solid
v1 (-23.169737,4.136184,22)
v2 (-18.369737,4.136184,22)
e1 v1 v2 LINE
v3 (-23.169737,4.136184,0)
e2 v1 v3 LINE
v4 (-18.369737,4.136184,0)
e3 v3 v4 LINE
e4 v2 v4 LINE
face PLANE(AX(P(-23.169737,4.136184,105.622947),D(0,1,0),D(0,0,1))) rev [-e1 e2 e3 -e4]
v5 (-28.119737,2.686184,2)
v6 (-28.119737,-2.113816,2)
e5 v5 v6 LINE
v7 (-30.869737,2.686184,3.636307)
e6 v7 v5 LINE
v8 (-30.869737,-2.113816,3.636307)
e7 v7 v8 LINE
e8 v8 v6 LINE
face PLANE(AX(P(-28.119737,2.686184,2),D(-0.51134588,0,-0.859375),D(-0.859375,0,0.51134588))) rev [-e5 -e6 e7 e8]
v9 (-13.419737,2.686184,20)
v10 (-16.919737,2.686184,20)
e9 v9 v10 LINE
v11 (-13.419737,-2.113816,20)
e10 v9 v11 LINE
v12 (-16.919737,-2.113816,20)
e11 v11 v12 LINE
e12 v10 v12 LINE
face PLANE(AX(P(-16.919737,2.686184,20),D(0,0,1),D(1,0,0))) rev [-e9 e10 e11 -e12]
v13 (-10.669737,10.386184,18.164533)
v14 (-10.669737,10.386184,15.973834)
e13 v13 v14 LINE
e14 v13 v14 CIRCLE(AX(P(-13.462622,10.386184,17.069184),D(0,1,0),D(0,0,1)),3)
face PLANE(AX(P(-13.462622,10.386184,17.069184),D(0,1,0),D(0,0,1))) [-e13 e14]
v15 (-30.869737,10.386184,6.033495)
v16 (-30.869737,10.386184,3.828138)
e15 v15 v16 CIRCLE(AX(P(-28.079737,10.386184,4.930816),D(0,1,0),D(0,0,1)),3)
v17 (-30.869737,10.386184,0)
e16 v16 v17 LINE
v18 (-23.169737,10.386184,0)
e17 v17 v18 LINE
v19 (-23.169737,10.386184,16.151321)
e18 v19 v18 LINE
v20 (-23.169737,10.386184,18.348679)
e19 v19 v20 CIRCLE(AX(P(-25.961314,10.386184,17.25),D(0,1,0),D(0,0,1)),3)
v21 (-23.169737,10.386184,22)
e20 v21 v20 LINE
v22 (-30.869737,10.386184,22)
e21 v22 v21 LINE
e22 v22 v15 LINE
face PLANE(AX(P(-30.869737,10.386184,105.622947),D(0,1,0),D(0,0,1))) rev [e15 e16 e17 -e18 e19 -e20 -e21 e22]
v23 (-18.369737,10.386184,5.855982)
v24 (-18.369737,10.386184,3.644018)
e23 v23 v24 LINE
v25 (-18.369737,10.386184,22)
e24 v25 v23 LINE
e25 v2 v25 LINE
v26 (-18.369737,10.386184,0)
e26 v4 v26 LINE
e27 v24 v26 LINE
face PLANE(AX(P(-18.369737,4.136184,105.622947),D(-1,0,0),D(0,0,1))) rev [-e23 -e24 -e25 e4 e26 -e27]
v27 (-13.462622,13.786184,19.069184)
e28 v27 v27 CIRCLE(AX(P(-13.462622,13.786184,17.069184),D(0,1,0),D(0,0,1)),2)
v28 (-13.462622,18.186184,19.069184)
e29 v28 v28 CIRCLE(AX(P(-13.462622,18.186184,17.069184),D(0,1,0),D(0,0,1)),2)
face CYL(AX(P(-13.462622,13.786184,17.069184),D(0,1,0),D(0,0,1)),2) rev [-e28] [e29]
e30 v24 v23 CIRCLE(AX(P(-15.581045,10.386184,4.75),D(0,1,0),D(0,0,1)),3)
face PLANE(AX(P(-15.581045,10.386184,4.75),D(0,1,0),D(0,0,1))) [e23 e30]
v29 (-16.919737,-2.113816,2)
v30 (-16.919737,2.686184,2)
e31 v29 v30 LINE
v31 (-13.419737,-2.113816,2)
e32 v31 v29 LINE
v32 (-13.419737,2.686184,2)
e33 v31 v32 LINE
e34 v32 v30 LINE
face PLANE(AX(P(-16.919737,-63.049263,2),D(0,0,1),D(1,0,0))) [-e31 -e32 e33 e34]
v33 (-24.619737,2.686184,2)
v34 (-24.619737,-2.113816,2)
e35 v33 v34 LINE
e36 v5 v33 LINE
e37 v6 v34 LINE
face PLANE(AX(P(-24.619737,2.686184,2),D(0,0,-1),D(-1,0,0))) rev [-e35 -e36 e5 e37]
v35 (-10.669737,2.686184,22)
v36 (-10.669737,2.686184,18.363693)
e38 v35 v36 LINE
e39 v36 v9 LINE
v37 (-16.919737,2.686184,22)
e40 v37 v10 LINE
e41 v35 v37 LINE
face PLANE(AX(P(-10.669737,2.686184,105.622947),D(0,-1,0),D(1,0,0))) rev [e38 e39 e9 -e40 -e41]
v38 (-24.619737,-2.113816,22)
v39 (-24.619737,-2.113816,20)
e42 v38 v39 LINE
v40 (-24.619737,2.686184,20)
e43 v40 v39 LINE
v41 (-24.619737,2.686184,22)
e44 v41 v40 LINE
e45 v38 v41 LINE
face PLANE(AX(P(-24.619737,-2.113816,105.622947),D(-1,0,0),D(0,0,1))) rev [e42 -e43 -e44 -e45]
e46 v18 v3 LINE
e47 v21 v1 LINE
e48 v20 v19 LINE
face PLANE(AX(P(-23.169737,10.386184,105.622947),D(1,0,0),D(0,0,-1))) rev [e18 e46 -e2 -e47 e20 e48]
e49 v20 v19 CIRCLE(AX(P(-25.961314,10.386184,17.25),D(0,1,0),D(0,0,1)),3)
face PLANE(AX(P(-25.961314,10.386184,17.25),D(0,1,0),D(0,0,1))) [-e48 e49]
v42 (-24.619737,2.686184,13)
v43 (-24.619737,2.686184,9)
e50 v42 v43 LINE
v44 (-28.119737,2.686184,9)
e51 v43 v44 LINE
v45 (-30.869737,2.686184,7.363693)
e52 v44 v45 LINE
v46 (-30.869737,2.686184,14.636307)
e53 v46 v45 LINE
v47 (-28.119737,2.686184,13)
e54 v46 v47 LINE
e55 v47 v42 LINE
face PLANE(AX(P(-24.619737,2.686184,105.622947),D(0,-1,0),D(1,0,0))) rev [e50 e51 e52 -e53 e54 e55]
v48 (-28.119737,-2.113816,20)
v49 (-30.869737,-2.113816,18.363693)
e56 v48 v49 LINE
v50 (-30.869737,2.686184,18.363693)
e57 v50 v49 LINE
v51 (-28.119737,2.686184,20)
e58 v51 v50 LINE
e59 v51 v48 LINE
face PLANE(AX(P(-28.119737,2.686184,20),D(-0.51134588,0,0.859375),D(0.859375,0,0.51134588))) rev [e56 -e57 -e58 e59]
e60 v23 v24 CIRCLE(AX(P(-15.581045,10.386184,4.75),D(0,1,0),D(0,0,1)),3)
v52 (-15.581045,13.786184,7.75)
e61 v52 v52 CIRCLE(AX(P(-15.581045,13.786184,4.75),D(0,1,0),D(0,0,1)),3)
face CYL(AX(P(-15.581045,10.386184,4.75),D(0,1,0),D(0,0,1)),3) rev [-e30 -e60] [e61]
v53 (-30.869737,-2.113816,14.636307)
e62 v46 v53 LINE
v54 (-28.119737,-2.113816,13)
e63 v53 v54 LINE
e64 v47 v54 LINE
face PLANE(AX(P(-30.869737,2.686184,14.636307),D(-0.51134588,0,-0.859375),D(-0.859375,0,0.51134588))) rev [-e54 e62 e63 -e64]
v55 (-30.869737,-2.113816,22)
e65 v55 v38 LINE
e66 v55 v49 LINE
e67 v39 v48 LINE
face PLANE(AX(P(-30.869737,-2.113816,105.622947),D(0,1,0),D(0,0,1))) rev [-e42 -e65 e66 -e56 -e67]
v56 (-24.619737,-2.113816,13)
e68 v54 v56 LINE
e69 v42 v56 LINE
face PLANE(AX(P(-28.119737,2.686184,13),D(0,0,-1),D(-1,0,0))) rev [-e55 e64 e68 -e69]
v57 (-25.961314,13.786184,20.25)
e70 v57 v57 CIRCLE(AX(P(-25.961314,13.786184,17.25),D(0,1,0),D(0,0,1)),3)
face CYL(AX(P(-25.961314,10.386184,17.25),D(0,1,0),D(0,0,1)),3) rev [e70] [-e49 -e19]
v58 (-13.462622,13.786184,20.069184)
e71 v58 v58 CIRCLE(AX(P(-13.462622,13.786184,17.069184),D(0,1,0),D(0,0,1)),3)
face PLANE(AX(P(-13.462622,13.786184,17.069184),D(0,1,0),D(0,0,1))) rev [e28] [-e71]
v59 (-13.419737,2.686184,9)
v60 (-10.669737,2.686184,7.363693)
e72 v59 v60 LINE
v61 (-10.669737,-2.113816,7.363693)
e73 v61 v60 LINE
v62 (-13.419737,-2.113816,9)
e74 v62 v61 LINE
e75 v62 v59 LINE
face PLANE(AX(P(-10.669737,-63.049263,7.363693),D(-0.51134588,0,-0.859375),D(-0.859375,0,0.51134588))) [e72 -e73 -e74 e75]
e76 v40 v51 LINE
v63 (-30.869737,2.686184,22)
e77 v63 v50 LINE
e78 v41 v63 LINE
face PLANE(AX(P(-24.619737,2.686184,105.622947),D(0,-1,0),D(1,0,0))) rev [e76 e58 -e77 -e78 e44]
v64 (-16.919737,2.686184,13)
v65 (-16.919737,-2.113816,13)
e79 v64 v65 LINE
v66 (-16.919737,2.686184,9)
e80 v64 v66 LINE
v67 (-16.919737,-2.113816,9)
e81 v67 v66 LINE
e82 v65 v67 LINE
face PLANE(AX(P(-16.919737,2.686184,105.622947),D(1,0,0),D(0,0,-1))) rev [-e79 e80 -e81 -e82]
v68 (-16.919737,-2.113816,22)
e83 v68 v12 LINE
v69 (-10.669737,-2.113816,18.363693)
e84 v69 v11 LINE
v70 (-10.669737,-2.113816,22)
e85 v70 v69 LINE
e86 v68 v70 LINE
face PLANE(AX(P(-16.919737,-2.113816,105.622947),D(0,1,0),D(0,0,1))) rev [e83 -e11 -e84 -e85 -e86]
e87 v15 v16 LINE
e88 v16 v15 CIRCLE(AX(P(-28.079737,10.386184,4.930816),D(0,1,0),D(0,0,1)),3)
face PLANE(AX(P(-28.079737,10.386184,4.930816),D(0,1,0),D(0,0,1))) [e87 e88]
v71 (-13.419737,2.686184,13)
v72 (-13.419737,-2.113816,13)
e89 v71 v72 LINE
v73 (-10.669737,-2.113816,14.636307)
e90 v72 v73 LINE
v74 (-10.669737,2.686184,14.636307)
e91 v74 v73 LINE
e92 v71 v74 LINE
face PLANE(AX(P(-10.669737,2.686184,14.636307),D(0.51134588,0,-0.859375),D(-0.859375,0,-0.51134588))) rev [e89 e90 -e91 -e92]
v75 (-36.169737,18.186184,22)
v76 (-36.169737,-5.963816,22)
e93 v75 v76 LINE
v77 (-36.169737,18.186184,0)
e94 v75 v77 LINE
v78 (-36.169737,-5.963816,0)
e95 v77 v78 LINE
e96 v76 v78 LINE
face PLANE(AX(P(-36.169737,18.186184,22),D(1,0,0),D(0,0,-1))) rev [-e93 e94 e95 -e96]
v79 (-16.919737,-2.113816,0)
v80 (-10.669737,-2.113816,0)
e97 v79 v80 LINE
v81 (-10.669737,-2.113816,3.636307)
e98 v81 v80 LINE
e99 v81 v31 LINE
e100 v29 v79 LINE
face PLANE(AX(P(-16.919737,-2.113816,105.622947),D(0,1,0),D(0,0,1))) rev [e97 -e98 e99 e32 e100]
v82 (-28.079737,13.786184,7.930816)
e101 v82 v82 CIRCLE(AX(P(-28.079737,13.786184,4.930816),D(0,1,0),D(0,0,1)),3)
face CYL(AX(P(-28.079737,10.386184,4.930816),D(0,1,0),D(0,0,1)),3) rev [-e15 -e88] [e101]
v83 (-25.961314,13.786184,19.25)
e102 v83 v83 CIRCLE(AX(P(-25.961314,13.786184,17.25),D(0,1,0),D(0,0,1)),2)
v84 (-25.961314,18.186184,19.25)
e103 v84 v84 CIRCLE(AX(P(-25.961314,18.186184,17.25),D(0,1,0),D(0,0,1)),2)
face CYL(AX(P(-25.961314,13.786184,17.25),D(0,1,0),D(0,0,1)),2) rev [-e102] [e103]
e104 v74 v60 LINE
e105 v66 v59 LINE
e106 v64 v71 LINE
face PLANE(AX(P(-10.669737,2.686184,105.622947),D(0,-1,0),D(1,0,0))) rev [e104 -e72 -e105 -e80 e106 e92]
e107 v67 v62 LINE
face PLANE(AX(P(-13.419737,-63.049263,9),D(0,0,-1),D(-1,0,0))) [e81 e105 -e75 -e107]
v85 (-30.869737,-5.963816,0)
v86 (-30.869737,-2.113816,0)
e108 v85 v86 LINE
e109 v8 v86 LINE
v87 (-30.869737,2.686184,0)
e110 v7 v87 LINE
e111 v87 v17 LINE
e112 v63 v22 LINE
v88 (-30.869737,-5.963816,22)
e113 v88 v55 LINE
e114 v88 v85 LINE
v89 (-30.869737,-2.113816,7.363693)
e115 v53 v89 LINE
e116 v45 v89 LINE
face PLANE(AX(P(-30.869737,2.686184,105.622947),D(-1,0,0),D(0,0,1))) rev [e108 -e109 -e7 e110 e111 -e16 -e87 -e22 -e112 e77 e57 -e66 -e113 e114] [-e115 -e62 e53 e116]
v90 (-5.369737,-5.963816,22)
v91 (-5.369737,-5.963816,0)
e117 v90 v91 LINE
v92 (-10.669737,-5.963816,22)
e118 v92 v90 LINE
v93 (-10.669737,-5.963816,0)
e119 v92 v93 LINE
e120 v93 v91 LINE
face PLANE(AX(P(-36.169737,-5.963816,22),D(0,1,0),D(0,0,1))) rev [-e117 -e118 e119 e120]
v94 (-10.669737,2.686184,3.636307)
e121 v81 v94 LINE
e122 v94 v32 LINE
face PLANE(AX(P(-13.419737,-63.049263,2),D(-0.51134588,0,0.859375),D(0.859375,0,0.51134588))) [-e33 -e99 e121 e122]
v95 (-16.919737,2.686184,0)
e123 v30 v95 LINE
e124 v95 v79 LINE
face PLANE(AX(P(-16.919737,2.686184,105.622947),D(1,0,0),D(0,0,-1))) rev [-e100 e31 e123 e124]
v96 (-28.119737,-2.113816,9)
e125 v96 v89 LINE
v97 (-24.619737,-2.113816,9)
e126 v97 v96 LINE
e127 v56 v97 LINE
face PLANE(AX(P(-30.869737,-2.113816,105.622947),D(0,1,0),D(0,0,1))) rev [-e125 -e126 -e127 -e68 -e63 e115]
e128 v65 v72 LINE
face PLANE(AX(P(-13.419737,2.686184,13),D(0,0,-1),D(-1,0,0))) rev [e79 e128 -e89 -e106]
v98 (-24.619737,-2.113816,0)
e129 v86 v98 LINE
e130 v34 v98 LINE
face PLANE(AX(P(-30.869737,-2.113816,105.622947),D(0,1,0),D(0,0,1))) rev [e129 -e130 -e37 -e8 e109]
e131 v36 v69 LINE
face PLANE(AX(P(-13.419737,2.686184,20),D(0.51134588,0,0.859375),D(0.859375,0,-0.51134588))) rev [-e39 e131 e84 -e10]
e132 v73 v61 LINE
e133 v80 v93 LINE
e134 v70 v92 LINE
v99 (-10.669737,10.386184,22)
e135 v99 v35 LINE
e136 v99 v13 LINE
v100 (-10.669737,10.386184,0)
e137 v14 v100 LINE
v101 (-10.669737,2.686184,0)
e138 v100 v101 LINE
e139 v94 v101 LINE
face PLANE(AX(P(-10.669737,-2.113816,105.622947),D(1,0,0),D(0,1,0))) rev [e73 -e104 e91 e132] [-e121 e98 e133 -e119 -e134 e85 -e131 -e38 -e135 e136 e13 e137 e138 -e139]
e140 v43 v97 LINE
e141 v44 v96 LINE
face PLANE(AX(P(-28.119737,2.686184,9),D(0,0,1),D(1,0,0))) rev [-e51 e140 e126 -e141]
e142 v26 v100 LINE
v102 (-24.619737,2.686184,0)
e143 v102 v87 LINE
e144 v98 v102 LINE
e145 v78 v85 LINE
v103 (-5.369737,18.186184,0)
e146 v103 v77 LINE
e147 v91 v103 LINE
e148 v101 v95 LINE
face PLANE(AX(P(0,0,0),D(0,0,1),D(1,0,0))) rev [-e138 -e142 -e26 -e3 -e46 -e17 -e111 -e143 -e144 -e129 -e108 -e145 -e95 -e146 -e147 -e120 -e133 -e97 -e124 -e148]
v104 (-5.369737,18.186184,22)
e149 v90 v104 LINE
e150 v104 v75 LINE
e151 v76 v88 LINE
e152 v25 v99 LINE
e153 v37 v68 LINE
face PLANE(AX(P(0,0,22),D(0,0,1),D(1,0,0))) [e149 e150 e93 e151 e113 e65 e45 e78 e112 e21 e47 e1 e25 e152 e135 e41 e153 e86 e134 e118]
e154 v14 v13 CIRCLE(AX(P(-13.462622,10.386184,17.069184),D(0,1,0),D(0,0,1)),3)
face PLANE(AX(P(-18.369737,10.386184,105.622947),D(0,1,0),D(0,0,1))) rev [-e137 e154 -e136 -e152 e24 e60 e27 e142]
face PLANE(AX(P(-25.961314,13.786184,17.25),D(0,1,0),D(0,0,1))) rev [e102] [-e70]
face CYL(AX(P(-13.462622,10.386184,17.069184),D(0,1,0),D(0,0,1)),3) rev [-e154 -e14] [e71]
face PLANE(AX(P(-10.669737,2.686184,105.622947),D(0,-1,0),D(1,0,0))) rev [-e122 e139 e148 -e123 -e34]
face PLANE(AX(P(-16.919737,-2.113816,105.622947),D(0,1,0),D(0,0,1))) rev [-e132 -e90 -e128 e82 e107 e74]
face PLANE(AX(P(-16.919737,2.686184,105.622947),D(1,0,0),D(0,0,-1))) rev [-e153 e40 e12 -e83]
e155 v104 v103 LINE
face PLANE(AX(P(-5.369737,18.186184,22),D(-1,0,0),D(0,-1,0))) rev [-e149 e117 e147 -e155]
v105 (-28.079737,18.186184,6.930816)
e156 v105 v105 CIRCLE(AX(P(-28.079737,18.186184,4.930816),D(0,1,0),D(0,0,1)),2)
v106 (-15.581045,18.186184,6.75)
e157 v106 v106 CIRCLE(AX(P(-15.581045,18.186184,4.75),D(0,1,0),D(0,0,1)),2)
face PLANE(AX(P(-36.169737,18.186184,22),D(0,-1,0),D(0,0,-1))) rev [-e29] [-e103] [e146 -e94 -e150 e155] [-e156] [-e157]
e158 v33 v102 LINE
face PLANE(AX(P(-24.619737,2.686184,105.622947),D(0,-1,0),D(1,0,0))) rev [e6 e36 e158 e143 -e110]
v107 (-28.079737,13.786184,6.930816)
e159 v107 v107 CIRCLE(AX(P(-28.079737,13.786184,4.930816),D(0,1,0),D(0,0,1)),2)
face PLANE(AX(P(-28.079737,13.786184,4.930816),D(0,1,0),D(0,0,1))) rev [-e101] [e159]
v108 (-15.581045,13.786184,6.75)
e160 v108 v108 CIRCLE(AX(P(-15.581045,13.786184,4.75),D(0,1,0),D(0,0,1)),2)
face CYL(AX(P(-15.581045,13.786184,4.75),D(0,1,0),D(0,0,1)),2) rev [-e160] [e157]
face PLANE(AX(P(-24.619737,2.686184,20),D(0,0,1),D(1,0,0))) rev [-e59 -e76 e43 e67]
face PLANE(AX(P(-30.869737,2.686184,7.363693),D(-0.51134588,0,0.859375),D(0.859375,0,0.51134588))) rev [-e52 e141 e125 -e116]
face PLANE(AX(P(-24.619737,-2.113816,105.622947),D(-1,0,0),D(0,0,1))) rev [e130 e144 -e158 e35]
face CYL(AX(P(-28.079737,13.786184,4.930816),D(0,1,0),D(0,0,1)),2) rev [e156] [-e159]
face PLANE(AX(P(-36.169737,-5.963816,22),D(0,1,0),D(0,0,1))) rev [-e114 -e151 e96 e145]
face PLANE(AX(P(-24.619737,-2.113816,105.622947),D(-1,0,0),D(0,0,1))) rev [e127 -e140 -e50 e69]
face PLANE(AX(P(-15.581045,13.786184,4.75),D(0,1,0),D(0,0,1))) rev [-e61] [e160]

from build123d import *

# Parameters (mm, degrees)
ESQUISSE1_W                   = 30.8
ESQUISSE1_H                   = 24.15
BOSS_EXTRU_1_DEPTH            = 22
ENL_V_START                   = -22
ENL_V_MAT_EXTRU_2_DEPTH       = 22
ENL_V_MAT_EXTRU_14_DEPTH      = 47.950397903
ENL_V_MAT_EXTRU_14_DEPTH_BACK = 4.8
ENL_V_MAT_EXTRU_19_DEPTH      = 4.8
ENL_V_MAT_EXTRU_20_DEPTH      = 4.8
ENL_V_MAT_EXTRU_21_DEPTH      = 4.8
ESQUISSE17_R                  = 2
ENL_V_MAT_EXTRU_22_DEPTH      = 4.4
ESQUISSE18_R                  = 3
ENL_V_MAT_EXTRU_24_DEPTH      = 3.4
ESQUISSE19_R                  = 3
ENL_V_MAT_EXTRU_29_DEPTH      = 3.4
ESQUISSE22_R                  = 3
ENL_V_MAT_EXTRU_30_DEPTH      = 3.4
ESQUISSE23_R                  = 3
ENL_V_MAT_EXTRU_31_DEPTH      = 3.4


# Read off the part's stored shape, not the designer's step: Enlèv. mat.-Extru.2
with BuildPart() as part:
    # Esquisse1 → Boss.-Extru.1 (new body)
    with BuildSketch(Plane.XY):
        with Locations((-20.769736842, 6.111184211)):
            Rectangle(ESQUISSE1_W, ESQUISSE1_H)
    extrude(amount=BOSS_EXTRU_1_DEPTH)

    # Enlèv. mat.-Extru.2 outline → Enlèv. mat.-Extru.2 (cut)
    with BuildSketch(Plane.XY.offset(22).offset(ENL_V_START)):
        Polygon((-30.869736842, -5.963815789), (-10.669736842, -5.963815789), (-10.669736842, -2.113815789), (-16.919736842, -2.113815789), (-16.919736842, 2.686184211), (-10.669736842, 2.686184211), (-10.669736842, 10.386184211), (-18.369736842, 10.386184211), (-18.369736842, 4.136184211), (-23.169736842, 4.136184211), (-23.169736842, 10.386184211), (-30.869736842, 10.386184211), (-30.869736842, 2.686184211), (-24.619736842, 2.686184211), (-24.619736842, -2.113815789), (-30.869736842, -2.113815789), align=None)
    extrude(amount=ENL_V_MAT_EXTRU_2_DEPTH, mode=Mode.SUBTRACT)

    # Esquisse12 → Enlèv. mat.-Extru.14 (cut, two sides: drawn at the far end of the back side and taken through both)
    with BuildSketch(Plane(origin=(0, -2.113815789, 0), x_dir=(-1, 0, 0), z_dir=(0, -1, 0)).offset(-ENL_V_MAT_EXTRU_14_DEPTH_BACK)):
        Polygon((16.919736842, -9), (16.919736842, -2), (13.419736842, -2), (10.669736842, -3.636306817), (10.669736842, -7.363693183), (13.419736842, -9), align=None)
    extrude(amount=ENL_V_MAT_EXTRU_14_DEPTH + ENL_V_MAT_EXTRU_14_DEPTH_BACK, mode=Mode.SUBTRACT)

    # Esquisse13 → Enlèv. mat.-Extru.19 (cut)
    with BuildSketch(Plane(origin=(0, -2.113815789, 0), x_dir=(-1, 0, 0), z_dir=(0, -1, 0))):
        Polygon((24.619736842, -2), (28.119736842, -2), (30.869736842, -3.636306817), (30.869736842, -7.363693183), (28.119736842, -9), (24.619736842, -9), align=None)
    extrude(amount=-ENL_V_MAT_EXTRU_19_DEPTH, mode=Mode.SUBTRACT)

    # Esquisse14 → Enlèv. mat.-Extru.20 (cut)
    with BuildSketch(Plane(origin=(0, -2.113815789, 0), x_dir=(-1, 0, 0), z_dir=(0, -1, 0))):
        Polygon((24.619736842, -20), (28.119736842, -20), (30.869736842, -18.363693183), (30.869736842, -14.636306817), (28.119736842, -13), (24.619736842, -13), align=None)
    extrude(amount=-ENL_V_MAT_EXTRU_20_DEPTH, mode=Mode.SUBTRACT)

    # Esquisse16 → Enlèv. mat.-Extru.21 (cut)
    with BuildSketch(Plane(origin=(0, -2.113815789, 0), x_dir=(-1, 0, 0), z_dir=(0, -1, 0))):
        Polygon((16.919736842, -20), (13.419736842, -20), (10.669736842, -18.363693183), (10.669736842, -14.636306817), (13.419736842, -13), (16.919736842, -13), align=None)
    extrude(amount=-ENL_V_MAT_EXTRU_21_DEPTH, mode=Mode.SUBTRACT)

    # Esquisse17 → Enlèv. mat.-Extru.22 (cut)
    with BuildSketch(Plane(origin=(0, 18.186184211, 0), x_dir=(1, 0, 0), z_dir=(0, 1, 0))):
        with Locations(Location((-15.581044692, -4.75, 0), (0, 0, 270))):
            Circle(ESQUISSE17_R)
        with Locations(Location((-13.462622288, -17.069183679, 0), (0, 0, 270))):
            Circle(ESQUISSE17_R)
        with Locations(Location((-25.961314438, -17.25, 0), (0, 0, 270))):
            Circle(ESQUISSE17_R)
        with Locations(Location((-28.079736842, -4.930816321, 0), (0, 0, 270))):
            Circle(ESQUISSE17_R)
    extrude(amount=-ENL_V_MAT_EXTRU_22_DEPTH, mode=Mode.SUBTRACT)

    # Esquisse18 → Enlèv. mat.-Extru.24 (cut)
    with BuildSketch(Plane(origin=(0, 13.786184211, 0), x_dir=(1, 0, 0), z_dir=(0, 1, 0))):
        with Locations(Location((-28.079736842, -4.930816321, 0), (0, 0, 270))):
            Circle(ESQUISSE18_R)
    extrude(amount=-ENL_V_MAT_EXTRU_24_DEPTH, mode=Mode.SUBTRACT)

    # Esquisse19 → Enlèv. mat.-Extru.29 (cut)
    with BuildSketch(Plane(origin=(0, 13.786184211, 0), x_dir=(1, 0, 0), z_dir=(0, 1, 0))):
        with Locations(Location((-25.961314438, -17.25, 0), (0, 0, 270))):
            Circle(ESQUISSE19_R)
    extrude(amount=-ENL_V_MAT_EXTRU_29_DEPTH, mode=Mode.SUBTRACT)

    # Esquisse22 → Enlèv. mat.-Extru.30 (cut)
    with BuildSketch(Plane(origin=(0, 13.786184211, 0), x_dir=(1, 0, 0), z_dir=(0, 1, 0))):
        with Locations(Location((-15.581044692, -4.75, 0), (0, 0, 270))):
            Circle(ESQUISSE22_R)
    extrude(amount=-ENL_V_MAT_EXTRU_30_DEPTH, mode=Mode.SUBTRACT)

    # Esquisse23 → Enlèv. mat.-Extru.31 (cut)
    with BuildSketch(Plane(origin=(0, 13.786184211, 0), x_dir=(1, 0, 0), z_dir=(0, 1, 0))):
        with Locations(Location((-13.462622288, -17.069183679, 0), (0, 0, 270))):
            Circle(ESQUISSE23_R)
    extrude(amount=-ENL_V_MAT_EXTRU_31_DEPTH, mode=Mode.SUBTRACT)


solid = part.part
